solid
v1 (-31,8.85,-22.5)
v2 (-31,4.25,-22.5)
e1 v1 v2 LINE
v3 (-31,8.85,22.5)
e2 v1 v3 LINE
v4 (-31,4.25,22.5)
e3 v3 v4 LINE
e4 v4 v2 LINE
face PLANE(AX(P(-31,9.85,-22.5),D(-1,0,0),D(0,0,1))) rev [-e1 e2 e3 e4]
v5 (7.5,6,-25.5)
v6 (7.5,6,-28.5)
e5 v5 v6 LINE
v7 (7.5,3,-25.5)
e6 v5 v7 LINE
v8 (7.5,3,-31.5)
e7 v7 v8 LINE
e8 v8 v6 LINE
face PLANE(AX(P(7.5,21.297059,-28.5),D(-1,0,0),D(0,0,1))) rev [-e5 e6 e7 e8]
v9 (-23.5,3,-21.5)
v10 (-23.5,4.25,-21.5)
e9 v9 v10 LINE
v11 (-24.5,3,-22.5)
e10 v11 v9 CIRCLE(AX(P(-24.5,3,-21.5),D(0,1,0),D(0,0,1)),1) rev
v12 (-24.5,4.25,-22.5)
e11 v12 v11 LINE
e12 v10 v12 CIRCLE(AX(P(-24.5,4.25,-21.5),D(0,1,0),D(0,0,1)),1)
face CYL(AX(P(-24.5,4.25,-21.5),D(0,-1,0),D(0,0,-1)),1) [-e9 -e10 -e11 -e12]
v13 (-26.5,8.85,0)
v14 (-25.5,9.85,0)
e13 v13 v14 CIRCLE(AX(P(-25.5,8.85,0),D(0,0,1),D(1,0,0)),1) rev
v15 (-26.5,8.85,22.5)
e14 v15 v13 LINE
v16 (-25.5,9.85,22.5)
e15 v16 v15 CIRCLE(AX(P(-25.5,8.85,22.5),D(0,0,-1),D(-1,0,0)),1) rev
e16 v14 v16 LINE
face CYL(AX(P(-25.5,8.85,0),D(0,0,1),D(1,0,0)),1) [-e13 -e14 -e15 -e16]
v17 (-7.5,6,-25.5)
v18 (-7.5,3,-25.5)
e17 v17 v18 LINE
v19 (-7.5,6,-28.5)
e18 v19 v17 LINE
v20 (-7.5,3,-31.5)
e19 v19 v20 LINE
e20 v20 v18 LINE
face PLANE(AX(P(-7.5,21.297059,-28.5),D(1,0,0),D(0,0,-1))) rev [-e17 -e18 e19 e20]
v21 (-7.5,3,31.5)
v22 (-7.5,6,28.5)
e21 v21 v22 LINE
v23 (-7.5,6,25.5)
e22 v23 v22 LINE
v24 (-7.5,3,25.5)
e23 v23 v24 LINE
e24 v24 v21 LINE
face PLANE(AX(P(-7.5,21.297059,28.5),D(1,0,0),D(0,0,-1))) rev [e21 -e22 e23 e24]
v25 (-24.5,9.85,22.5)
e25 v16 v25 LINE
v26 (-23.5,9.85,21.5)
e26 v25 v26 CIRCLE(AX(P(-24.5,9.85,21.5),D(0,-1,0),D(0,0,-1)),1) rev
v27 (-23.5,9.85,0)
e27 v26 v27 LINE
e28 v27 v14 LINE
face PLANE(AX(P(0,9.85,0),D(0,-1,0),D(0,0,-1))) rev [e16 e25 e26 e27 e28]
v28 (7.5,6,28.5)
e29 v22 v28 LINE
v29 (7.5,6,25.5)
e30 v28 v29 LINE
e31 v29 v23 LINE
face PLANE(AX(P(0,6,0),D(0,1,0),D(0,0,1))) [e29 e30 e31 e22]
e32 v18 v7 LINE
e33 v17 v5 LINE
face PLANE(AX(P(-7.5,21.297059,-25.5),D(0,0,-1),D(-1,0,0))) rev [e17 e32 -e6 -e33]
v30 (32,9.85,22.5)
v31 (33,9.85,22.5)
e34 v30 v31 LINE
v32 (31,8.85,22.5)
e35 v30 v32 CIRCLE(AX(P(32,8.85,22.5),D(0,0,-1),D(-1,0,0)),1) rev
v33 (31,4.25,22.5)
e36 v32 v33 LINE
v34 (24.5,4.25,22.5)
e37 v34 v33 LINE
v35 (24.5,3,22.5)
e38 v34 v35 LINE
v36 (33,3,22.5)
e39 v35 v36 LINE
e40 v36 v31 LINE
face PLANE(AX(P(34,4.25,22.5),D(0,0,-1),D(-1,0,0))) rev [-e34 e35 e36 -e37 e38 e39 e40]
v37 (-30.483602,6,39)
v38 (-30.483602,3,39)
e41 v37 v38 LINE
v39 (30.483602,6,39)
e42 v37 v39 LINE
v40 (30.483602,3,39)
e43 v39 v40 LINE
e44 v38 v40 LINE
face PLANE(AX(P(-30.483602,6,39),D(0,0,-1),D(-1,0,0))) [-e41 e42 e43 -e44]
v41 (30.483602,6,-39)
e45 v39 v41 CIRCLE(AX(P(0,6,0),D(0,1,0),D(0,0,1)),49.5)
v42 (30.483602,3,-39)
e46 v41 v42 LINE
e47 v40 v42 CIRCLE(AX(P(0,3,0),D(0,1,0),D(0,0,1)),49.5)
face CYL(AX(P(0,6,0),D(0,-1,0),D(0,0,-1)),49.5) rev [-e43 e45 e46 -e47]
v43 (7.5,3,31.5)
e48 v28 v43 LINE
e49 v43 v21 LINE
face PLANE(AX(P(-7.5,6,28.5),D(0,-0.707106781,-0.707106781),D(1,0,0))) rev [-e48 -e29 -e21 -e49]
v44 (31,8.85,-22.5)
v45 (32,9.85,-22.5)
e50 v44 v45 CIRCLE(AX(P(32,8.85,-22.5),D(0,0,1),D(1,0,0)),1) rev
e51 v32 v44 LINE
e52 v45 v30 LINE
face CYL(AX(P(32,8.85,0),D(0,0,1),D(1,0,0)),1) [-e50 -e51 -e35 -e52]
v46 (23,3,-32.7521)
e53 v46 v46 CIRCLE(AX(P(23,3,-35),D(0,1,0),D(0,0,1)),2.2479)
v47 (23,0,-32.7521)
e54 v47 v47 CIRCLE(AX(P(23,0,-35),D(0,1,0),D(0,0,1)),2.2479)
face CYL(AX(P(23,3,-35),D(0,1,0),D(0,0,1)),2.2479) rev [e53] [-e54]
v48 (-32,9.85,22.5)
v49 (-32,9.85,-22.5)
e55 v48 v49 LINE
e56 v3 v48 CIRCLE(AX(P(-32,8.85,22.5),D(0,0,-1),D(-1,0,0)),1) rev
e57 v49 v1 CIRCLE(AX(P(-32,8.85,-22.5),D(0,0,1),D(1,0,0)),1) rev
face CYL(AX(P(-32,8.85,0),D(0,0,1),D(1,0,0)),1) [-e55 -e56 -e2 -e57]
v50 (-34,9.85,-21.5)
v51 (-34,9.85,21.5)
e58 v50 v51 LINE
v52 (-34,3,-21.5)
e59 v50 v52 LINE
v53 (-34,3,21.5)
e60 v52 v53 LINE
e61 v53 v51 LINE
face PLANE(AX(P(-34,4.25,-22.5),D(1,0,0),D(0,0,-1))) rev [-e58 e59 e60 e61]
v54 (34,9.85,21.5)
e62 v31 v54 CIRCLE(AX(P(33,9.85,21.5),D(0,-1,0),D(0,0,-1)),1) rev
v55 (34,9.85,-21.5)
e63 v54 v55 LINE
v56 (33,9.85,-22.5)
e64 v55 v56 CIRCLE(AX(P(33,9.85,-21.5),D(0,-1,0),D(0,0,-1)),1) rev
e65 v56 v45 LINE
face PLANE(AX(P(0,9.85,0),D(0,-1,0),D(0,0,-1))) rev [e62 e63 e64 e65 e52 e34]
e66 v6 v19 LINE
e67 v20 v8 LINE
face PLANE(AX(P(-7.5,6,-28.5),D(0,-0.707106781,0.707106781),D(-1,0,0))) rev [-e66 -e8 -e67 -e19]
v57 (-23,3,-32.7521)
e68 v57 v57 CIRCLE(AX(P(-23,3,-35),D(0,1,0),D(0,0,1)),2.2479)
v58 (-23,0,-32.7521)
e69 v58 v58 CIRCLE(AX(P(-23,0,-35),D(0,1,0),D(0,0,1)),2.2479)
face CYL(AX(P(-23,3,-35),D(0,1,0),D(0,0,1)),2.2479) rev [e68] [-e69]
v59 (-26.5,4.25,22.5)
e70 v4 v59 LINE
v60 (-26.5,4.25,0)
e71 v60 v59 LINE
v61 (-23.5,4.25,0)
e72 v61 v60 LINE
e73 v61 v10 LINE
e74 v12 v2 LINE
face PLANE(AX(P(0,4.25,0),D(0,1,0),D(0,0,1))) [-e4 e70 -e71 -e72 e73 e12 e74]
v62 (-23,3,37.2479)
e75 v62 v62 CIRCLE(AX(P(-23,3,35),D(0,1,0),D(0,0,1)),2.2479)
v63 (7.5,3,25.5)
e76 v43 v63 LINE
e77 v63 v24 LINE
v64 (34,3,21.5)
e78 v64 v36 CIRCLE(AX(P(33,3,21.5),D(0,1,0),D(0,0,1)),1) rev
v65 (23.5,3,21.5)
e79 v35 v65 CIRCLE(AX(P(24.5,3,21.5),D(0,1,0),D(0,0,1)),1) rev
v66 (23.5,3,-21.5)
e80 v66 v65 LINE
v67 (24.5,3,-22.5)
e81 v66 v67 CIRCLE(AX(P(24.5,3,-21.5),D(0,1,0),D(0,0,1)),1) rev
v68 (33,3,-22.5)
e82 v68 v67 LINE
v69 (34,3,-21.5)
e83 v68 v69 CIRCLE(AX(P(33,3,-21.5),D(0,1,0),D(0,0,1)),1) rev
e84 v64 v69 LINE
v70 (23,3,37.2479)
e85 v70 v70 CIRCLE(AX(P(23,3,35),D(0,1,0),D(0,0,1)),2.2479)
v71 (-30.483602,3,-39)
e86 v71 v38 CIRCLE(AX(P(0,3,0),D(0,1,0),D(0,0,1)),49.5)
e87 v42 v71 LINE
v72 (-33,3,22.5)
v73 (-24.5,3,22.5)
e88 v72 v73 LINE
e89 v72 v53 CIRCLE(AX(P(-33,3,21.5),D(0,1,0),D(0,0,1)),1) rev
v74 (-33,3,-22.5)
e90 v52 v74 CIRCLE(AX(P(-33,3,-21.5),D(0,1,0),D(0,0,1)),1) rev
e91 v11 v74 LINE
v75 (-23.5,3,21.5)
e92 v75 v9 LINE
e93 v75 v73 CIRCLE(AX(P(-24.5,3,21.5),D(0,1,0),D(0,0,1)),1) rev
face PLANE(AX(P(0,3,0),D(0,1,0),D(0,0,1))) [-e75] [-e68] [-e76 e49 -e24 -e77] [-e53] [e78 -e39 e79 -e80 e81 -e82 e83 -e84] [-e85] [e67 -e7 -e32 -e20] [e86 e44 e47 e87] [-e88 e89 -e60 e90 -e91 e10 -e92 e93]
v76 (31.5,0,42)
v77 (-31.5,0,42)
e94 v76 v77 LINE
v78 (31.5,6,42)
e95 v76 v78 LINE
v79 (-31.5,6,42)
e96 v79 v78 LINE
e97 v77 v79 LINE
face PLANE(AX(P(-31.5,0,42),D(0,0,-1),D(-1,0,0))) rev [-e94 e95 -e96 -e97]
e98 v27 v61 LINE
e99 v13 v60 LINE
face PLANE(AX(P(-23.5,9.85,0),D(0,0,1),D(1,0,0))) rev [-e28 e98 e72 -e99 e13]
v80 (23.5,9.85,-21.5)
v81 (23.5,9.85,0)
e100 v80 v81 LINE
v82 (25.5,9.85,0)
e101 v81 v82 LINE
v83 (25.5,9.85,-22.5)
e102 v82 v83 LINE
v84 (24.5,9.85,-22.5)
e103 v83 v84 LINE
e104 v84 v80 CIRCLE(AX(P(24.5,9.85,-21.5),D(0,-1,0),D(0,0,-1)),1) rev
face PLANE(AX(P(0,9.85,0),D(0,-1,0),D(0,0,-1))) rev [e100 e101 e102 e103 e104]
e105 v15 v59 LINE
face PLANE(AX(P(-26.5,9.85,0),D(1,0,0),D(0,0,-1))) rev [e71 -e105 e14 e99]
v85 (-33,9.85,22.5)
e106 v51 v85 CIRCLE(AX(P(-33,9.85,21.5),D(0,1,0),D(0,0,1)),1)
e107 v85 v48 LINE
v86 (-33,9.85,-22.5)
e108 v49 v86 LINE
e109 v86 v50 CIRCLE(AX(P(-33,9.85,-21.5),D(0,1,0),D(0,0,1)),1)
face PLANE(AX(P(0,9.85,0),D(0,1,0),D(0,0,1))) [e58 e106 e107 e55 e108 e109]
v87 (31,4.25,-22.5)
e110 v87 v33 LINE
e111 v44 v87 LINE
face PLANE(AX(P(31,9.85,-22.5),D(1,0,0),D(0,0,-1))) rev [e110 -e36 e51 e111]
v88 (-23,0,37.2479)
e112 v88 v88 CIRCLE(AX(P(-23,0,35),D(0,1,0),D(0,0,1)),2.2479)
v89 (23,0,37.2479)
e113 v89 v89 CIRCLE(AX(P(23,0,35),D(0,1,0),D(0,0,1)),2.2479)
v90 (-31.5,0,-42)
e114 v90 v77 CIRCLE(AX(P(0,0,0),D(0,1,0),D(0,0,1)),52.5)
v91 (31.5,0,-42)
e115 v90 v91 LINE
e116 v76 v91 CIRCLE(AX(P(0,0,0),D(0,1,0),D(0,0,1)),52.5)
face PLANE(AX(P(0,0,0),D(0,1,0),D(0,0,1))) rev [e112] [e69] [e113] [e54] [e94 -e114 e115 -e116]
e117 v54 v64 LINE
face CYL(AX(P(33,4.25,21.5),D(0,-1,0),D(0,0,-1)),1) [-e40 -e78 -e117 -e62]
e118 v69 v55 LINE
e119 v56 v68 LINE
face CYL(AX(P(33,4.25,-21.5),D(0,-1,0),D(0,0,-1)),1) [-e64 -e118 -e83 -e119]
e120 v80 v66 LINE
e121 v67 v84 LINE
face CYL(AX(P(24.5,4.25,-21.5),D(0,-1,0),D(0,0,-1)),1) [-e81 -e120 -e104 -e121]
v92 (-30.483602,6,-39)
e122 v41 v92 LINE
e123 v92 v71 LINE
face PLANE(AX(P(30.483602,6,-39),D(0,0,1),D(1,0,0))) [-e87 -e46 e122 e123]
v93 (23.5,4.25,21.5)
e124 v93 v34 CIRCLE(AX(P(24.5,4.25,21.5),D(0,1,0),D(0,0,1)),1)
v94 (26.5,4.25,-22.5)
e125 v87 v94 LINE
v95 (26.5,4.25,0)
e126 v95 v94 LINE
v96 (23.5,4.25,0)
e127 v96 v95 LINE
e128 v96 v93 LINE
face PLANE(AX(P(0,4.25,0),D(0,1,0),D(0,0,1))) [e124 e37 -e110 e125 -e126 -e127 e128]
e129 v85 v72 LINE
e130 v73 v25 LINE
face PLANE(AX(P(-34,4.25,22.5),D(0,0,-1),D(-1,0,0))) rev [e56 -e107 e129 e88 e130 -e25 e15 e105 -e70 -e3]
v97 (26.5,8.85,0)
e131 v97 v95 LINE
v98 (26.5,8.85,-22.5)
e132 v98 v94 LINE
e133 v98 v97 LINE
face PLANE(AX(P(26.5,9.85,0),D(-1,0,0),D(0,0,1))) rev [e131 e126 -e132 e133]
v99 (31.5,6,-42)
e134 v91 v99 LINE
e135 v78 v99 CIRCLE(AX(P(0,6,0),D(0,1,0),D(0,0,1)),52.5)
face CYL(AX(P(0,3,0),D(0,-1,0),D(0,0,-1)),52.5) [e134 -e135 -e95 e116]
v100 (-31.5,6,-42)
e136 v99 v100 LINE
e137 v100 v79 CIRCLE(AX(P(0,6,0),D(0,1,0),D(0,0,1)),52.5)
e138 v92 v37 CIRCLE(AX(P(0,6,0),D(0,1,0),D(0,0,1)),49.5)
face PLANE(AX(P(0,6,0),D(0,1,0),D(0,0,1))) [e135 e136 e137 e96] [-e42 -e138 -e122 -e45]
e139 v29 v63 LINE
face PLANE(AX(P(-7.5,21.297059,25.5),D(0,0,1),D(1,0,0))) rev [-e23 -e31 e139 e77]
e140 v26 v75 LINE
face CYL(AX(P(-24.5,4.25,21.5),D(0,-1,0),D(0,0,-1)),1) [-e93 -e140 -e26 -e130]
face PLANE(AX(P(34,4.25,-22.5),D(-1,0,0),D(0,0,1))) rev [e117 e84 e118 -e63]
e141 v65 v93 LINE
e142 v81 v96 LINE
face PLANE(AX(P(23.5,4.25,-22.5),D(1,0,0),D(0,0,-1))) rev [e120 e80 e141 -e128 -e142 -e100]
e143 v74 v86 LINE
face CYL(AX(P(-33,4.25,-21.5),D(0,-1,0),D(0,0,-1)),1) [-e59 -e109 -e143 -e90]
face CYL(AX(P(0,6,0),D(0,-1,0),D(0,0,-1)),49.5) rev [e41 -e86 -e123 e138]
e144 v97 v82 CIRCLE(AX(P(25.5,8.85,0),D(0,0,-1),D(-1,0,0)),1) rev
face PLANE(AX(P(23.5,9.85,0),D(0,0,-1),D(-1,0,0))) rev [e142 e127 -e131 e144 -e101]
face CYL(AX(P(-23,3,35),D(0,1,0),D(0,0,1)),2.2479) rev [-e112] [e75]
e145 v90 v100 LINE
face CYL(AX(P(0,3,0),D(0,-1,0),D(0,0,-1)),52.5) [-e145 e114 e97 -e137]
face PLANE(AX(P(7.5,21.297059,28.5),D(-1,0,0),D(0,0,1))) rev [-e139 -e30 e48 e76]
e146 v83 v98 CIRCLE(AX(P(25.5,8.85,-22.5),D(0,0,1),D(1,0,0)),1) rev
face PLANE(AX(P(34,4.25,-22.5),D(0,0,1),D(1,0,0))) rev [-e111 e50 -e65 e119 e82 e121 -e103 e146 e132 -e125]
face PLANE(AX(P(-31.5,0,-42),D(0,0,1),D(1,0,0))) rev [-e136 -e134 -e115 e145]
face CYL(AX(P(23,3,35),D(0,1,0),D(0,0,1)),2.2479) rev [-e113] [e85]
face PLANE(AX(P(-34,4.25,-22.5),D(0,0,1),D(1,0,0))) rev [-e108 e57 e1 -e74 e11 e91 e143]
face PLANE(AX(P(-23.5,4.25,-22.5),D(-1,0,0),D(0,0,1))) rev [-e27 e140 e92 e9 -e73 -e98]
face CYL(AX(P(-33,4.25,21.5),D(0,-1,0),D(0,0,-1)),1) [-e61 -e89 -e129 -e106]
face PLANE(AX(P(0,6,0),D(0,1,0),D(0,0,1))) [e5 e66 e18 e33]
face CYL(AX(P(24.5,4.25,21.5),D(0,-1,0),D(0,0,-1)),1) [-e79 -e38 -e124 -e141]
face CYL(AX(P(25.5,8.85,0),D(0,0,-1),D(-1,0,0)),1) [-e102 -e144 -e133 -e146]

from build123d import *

# Parameters (mm, degrees)
A_BASE_T42_OUTLINE_R               = 2.2479
A_BASE_T42_OUTLINE_R_2             = 1
A_BASE_T42_DEPTH                   = 3
OUTER_BRIM_DEPTH                   = 3
SKETCH5_W                          = 15
SKETCH5_H                          = 3
BASE_SUPPORTS_DEPTH                = 3
BASE_SUPPORTS_CHAMFER_SIZE         = 3
COVER_START                        = -3
SKETCH6_R                          = 1
COVER_DEPTH                        = 3
SKETCH2_W                          = 10.5
SKETCH2_H                          = 45
DYNAMIXEL_OFFSET_DEPTH             = 1.25
SKETCH3_W                          = 3
SKETCH3_H                          = 45
SKETCH3_H_2                        = 22.5
DYNAMIXEL_SIDE_SUPPORT_WALLS_DEPTH = 5.6
DYNAMIXEL_SUPPORT_CONTOURING_R     = 1


# Read off the part's stored shape, not the designer's step: a_base_t42
with BuildPart() as part:
    # a_base_t42 outline → a_base_t42 (new body)
    with BuildSketch(Plane(origin=(0, 0, 0), x_dir=(1, 0, 0), z_dir=(0, 1, 0))):
        with BuildLine():
            ThreePointArc((31.5, -42), (52.5, 0), (31.5, 42))
            Line((31.5, 42), (-31.5, 42))
            ThreePointArc((-31.5, 42), (-52.5, 0), (-31.5, -42))
            Line((-31.5, -42), (31.5, -42))
        make_face()
        with Locations((-23, -35)):
            Circle(A_BASE_T42_OUTLINE_R, mode=Mode.SUBTRACT)
        with Locations((23, -35)):
            Circle(A_BASE_T42_OUTLINE_R, mode=Mode.SUBTRACT)
        with Locations((-40.25, 0)):
            Circle(A_BASE_T42_OUTLINE_R_2, mode=Mode.SUBTRACT)
        with Locations((-23, 35)):
            Circle(A_BASE_T42_OUTLINE_R, mode=Mode.SUBTRACT)
        with Locations((40.25, 0)):
            Circle(A_BASE_T42_OUTLINE_R_2, mode=Mode.SUBTRACT)
        with Locations((23, 35)):
            Circle(A_BASE_T42_OUTLINE_R, mode=Mode.SUBTRACT)
    extrude(amount=A_BASE_T42_DEPTH)

    # Sketch1 → Outer Brim (add)
    with BuildSketch(Plane(origin=(0, 3, 0), x_dir=(1, 0, 0), z_dir=(0, 1, 0))):
        with BuildLine():
            Line((-31.5, -42), (31.5, -42))
            ThreePointArc((31.5, -42), (52.5, 0), (31.5, 42))
            Line((31.5, 42), (-31.5, 42))
            ThreePointArc((-31.5, 42), (-52.5, 0), (-31.5, -42))
        make_face()
        with BuildLine():
            Line((30.483602149, 39), (-30.483602149, 39))
            ThreePointArc((-30.483602149, 39), (-49.5, 0), (-30.483602149, -39))
            Line((-30.483602149, -39), (30.483602149, -39))
            ThreePointArc((30.483602149, -39), (49.5, 0), (30.483602149, 39))
        make_face(mode=Mode.SUBTRACT)
    extrude(amount=OUTER_BRIM_DEPTH)

    # Sketch5 → Base Supports (add)
    with BuildSketch(Plane(origin=(0, 3, 0), x_dir=(1, 0, 0), z_dir=(0, 1, 0))):
        with Locations((0, -27)):
            Rectangle(SKETCH5_W, SKETCH5_H)
        with Locations((0, 27)):
            Rectangle(SKETCH5_W, SKETCH5_H)
    extrude(amount=BASE_SUPPORTS_DEPTH)

    # Base Supports Chamfer
    base_supports_chamfer_edges = [part.edges().sort_by_distance(p)[0] for p in [
        (0, 3, 28.5),
        (0, 3, -28.5),
    ]]
    chamfer(base_supports_chamfer_edges, length=BASE_SUPPORTS_CHAMFER_SIZE - 0.0001)  # a hair under: the kernel refuses the full size

    # Sketch6 → Cover (add)
    with BuildSketch(Plane(origin=(0, 3, 0), x_dir=(1, 0, 0), z_dir=(0, 1, 0)).offset(COVER_START)):
        with Locations((-40.25, 0)):
            Circle(SKETCH6_R)
        with Locations((40.25, 0)):
            Circle(SKETCH6_R)
    extrude(amount=COVER_DEPTH)

    # Sketch2 → Dynamixel Offset (add)
    with BuildSketch(Plane(origin=(0, 3, 0), x_dir=(1, 0, 0), z_dir=(0, 1, 0))):
        with Locations((28.75, 0)):
            Rectangle(SKETCH2_W, SKETCH2_H)
        with Locations((-28.75, 0)):
            Rectangle(SKETCH2_W, SKETCH2_H)
    extrude(amount=DYNAMIXEL_OFFSET_DEPTH)

    # Sketch3 → Dynamixel Side Support Walls (add)
    with BuildSketch(Plane(origin=(0, 4.25, 0), x_dir=(1, 0, 0), z_dir=(0, 1, 0))):
        with Locations((-32.5, 0)):
            Rectangle(SKETCH3_W, SKETCH3_H)
        with Locations((-25, -11.25)):
            Rectangle(SKETCH3_W, SKETCH3_H_2)
        with Locations((25, 11.25)):
            Rectangle(SKETCH3_W, SKETCH3_H_2)
        with Locations((32.5, 0)):
            Rectangle(SKETCH3_W, SKETCH3_H)
    extrude(amount=DYNAMIXEL_SIDE_SUPPORT_WALLS_DEPTH)

    # Dynamixel Support Contouring
    dynamixel_support_contouring_edges = [part.edges().sort_by_distance(p)[0] for p in [
        (34, 6.425, -22.5),
        (23.5, 6.425, -22.5),
        (-23.5, 3.625, -22.5),
        (-34, 6.425, -22.5),
        (-34, 6.425, 22.5),
        (-23.5, 6.425, 22.5),
        (34, 6.425, 22.5),
        (23.5, 3.625, 22.5),
        (31, 9.85, 0),
        (26.5, 9.85, -11.25),
        (-26.5, 9.85, 11.25),
        (-31, 9.85, 0),
    ]]
    fillet(dynamixel_support_contouring_edges, radius=DYNAMIXEL_SUPPORT_CONTOURING_R)


solid = part.part
